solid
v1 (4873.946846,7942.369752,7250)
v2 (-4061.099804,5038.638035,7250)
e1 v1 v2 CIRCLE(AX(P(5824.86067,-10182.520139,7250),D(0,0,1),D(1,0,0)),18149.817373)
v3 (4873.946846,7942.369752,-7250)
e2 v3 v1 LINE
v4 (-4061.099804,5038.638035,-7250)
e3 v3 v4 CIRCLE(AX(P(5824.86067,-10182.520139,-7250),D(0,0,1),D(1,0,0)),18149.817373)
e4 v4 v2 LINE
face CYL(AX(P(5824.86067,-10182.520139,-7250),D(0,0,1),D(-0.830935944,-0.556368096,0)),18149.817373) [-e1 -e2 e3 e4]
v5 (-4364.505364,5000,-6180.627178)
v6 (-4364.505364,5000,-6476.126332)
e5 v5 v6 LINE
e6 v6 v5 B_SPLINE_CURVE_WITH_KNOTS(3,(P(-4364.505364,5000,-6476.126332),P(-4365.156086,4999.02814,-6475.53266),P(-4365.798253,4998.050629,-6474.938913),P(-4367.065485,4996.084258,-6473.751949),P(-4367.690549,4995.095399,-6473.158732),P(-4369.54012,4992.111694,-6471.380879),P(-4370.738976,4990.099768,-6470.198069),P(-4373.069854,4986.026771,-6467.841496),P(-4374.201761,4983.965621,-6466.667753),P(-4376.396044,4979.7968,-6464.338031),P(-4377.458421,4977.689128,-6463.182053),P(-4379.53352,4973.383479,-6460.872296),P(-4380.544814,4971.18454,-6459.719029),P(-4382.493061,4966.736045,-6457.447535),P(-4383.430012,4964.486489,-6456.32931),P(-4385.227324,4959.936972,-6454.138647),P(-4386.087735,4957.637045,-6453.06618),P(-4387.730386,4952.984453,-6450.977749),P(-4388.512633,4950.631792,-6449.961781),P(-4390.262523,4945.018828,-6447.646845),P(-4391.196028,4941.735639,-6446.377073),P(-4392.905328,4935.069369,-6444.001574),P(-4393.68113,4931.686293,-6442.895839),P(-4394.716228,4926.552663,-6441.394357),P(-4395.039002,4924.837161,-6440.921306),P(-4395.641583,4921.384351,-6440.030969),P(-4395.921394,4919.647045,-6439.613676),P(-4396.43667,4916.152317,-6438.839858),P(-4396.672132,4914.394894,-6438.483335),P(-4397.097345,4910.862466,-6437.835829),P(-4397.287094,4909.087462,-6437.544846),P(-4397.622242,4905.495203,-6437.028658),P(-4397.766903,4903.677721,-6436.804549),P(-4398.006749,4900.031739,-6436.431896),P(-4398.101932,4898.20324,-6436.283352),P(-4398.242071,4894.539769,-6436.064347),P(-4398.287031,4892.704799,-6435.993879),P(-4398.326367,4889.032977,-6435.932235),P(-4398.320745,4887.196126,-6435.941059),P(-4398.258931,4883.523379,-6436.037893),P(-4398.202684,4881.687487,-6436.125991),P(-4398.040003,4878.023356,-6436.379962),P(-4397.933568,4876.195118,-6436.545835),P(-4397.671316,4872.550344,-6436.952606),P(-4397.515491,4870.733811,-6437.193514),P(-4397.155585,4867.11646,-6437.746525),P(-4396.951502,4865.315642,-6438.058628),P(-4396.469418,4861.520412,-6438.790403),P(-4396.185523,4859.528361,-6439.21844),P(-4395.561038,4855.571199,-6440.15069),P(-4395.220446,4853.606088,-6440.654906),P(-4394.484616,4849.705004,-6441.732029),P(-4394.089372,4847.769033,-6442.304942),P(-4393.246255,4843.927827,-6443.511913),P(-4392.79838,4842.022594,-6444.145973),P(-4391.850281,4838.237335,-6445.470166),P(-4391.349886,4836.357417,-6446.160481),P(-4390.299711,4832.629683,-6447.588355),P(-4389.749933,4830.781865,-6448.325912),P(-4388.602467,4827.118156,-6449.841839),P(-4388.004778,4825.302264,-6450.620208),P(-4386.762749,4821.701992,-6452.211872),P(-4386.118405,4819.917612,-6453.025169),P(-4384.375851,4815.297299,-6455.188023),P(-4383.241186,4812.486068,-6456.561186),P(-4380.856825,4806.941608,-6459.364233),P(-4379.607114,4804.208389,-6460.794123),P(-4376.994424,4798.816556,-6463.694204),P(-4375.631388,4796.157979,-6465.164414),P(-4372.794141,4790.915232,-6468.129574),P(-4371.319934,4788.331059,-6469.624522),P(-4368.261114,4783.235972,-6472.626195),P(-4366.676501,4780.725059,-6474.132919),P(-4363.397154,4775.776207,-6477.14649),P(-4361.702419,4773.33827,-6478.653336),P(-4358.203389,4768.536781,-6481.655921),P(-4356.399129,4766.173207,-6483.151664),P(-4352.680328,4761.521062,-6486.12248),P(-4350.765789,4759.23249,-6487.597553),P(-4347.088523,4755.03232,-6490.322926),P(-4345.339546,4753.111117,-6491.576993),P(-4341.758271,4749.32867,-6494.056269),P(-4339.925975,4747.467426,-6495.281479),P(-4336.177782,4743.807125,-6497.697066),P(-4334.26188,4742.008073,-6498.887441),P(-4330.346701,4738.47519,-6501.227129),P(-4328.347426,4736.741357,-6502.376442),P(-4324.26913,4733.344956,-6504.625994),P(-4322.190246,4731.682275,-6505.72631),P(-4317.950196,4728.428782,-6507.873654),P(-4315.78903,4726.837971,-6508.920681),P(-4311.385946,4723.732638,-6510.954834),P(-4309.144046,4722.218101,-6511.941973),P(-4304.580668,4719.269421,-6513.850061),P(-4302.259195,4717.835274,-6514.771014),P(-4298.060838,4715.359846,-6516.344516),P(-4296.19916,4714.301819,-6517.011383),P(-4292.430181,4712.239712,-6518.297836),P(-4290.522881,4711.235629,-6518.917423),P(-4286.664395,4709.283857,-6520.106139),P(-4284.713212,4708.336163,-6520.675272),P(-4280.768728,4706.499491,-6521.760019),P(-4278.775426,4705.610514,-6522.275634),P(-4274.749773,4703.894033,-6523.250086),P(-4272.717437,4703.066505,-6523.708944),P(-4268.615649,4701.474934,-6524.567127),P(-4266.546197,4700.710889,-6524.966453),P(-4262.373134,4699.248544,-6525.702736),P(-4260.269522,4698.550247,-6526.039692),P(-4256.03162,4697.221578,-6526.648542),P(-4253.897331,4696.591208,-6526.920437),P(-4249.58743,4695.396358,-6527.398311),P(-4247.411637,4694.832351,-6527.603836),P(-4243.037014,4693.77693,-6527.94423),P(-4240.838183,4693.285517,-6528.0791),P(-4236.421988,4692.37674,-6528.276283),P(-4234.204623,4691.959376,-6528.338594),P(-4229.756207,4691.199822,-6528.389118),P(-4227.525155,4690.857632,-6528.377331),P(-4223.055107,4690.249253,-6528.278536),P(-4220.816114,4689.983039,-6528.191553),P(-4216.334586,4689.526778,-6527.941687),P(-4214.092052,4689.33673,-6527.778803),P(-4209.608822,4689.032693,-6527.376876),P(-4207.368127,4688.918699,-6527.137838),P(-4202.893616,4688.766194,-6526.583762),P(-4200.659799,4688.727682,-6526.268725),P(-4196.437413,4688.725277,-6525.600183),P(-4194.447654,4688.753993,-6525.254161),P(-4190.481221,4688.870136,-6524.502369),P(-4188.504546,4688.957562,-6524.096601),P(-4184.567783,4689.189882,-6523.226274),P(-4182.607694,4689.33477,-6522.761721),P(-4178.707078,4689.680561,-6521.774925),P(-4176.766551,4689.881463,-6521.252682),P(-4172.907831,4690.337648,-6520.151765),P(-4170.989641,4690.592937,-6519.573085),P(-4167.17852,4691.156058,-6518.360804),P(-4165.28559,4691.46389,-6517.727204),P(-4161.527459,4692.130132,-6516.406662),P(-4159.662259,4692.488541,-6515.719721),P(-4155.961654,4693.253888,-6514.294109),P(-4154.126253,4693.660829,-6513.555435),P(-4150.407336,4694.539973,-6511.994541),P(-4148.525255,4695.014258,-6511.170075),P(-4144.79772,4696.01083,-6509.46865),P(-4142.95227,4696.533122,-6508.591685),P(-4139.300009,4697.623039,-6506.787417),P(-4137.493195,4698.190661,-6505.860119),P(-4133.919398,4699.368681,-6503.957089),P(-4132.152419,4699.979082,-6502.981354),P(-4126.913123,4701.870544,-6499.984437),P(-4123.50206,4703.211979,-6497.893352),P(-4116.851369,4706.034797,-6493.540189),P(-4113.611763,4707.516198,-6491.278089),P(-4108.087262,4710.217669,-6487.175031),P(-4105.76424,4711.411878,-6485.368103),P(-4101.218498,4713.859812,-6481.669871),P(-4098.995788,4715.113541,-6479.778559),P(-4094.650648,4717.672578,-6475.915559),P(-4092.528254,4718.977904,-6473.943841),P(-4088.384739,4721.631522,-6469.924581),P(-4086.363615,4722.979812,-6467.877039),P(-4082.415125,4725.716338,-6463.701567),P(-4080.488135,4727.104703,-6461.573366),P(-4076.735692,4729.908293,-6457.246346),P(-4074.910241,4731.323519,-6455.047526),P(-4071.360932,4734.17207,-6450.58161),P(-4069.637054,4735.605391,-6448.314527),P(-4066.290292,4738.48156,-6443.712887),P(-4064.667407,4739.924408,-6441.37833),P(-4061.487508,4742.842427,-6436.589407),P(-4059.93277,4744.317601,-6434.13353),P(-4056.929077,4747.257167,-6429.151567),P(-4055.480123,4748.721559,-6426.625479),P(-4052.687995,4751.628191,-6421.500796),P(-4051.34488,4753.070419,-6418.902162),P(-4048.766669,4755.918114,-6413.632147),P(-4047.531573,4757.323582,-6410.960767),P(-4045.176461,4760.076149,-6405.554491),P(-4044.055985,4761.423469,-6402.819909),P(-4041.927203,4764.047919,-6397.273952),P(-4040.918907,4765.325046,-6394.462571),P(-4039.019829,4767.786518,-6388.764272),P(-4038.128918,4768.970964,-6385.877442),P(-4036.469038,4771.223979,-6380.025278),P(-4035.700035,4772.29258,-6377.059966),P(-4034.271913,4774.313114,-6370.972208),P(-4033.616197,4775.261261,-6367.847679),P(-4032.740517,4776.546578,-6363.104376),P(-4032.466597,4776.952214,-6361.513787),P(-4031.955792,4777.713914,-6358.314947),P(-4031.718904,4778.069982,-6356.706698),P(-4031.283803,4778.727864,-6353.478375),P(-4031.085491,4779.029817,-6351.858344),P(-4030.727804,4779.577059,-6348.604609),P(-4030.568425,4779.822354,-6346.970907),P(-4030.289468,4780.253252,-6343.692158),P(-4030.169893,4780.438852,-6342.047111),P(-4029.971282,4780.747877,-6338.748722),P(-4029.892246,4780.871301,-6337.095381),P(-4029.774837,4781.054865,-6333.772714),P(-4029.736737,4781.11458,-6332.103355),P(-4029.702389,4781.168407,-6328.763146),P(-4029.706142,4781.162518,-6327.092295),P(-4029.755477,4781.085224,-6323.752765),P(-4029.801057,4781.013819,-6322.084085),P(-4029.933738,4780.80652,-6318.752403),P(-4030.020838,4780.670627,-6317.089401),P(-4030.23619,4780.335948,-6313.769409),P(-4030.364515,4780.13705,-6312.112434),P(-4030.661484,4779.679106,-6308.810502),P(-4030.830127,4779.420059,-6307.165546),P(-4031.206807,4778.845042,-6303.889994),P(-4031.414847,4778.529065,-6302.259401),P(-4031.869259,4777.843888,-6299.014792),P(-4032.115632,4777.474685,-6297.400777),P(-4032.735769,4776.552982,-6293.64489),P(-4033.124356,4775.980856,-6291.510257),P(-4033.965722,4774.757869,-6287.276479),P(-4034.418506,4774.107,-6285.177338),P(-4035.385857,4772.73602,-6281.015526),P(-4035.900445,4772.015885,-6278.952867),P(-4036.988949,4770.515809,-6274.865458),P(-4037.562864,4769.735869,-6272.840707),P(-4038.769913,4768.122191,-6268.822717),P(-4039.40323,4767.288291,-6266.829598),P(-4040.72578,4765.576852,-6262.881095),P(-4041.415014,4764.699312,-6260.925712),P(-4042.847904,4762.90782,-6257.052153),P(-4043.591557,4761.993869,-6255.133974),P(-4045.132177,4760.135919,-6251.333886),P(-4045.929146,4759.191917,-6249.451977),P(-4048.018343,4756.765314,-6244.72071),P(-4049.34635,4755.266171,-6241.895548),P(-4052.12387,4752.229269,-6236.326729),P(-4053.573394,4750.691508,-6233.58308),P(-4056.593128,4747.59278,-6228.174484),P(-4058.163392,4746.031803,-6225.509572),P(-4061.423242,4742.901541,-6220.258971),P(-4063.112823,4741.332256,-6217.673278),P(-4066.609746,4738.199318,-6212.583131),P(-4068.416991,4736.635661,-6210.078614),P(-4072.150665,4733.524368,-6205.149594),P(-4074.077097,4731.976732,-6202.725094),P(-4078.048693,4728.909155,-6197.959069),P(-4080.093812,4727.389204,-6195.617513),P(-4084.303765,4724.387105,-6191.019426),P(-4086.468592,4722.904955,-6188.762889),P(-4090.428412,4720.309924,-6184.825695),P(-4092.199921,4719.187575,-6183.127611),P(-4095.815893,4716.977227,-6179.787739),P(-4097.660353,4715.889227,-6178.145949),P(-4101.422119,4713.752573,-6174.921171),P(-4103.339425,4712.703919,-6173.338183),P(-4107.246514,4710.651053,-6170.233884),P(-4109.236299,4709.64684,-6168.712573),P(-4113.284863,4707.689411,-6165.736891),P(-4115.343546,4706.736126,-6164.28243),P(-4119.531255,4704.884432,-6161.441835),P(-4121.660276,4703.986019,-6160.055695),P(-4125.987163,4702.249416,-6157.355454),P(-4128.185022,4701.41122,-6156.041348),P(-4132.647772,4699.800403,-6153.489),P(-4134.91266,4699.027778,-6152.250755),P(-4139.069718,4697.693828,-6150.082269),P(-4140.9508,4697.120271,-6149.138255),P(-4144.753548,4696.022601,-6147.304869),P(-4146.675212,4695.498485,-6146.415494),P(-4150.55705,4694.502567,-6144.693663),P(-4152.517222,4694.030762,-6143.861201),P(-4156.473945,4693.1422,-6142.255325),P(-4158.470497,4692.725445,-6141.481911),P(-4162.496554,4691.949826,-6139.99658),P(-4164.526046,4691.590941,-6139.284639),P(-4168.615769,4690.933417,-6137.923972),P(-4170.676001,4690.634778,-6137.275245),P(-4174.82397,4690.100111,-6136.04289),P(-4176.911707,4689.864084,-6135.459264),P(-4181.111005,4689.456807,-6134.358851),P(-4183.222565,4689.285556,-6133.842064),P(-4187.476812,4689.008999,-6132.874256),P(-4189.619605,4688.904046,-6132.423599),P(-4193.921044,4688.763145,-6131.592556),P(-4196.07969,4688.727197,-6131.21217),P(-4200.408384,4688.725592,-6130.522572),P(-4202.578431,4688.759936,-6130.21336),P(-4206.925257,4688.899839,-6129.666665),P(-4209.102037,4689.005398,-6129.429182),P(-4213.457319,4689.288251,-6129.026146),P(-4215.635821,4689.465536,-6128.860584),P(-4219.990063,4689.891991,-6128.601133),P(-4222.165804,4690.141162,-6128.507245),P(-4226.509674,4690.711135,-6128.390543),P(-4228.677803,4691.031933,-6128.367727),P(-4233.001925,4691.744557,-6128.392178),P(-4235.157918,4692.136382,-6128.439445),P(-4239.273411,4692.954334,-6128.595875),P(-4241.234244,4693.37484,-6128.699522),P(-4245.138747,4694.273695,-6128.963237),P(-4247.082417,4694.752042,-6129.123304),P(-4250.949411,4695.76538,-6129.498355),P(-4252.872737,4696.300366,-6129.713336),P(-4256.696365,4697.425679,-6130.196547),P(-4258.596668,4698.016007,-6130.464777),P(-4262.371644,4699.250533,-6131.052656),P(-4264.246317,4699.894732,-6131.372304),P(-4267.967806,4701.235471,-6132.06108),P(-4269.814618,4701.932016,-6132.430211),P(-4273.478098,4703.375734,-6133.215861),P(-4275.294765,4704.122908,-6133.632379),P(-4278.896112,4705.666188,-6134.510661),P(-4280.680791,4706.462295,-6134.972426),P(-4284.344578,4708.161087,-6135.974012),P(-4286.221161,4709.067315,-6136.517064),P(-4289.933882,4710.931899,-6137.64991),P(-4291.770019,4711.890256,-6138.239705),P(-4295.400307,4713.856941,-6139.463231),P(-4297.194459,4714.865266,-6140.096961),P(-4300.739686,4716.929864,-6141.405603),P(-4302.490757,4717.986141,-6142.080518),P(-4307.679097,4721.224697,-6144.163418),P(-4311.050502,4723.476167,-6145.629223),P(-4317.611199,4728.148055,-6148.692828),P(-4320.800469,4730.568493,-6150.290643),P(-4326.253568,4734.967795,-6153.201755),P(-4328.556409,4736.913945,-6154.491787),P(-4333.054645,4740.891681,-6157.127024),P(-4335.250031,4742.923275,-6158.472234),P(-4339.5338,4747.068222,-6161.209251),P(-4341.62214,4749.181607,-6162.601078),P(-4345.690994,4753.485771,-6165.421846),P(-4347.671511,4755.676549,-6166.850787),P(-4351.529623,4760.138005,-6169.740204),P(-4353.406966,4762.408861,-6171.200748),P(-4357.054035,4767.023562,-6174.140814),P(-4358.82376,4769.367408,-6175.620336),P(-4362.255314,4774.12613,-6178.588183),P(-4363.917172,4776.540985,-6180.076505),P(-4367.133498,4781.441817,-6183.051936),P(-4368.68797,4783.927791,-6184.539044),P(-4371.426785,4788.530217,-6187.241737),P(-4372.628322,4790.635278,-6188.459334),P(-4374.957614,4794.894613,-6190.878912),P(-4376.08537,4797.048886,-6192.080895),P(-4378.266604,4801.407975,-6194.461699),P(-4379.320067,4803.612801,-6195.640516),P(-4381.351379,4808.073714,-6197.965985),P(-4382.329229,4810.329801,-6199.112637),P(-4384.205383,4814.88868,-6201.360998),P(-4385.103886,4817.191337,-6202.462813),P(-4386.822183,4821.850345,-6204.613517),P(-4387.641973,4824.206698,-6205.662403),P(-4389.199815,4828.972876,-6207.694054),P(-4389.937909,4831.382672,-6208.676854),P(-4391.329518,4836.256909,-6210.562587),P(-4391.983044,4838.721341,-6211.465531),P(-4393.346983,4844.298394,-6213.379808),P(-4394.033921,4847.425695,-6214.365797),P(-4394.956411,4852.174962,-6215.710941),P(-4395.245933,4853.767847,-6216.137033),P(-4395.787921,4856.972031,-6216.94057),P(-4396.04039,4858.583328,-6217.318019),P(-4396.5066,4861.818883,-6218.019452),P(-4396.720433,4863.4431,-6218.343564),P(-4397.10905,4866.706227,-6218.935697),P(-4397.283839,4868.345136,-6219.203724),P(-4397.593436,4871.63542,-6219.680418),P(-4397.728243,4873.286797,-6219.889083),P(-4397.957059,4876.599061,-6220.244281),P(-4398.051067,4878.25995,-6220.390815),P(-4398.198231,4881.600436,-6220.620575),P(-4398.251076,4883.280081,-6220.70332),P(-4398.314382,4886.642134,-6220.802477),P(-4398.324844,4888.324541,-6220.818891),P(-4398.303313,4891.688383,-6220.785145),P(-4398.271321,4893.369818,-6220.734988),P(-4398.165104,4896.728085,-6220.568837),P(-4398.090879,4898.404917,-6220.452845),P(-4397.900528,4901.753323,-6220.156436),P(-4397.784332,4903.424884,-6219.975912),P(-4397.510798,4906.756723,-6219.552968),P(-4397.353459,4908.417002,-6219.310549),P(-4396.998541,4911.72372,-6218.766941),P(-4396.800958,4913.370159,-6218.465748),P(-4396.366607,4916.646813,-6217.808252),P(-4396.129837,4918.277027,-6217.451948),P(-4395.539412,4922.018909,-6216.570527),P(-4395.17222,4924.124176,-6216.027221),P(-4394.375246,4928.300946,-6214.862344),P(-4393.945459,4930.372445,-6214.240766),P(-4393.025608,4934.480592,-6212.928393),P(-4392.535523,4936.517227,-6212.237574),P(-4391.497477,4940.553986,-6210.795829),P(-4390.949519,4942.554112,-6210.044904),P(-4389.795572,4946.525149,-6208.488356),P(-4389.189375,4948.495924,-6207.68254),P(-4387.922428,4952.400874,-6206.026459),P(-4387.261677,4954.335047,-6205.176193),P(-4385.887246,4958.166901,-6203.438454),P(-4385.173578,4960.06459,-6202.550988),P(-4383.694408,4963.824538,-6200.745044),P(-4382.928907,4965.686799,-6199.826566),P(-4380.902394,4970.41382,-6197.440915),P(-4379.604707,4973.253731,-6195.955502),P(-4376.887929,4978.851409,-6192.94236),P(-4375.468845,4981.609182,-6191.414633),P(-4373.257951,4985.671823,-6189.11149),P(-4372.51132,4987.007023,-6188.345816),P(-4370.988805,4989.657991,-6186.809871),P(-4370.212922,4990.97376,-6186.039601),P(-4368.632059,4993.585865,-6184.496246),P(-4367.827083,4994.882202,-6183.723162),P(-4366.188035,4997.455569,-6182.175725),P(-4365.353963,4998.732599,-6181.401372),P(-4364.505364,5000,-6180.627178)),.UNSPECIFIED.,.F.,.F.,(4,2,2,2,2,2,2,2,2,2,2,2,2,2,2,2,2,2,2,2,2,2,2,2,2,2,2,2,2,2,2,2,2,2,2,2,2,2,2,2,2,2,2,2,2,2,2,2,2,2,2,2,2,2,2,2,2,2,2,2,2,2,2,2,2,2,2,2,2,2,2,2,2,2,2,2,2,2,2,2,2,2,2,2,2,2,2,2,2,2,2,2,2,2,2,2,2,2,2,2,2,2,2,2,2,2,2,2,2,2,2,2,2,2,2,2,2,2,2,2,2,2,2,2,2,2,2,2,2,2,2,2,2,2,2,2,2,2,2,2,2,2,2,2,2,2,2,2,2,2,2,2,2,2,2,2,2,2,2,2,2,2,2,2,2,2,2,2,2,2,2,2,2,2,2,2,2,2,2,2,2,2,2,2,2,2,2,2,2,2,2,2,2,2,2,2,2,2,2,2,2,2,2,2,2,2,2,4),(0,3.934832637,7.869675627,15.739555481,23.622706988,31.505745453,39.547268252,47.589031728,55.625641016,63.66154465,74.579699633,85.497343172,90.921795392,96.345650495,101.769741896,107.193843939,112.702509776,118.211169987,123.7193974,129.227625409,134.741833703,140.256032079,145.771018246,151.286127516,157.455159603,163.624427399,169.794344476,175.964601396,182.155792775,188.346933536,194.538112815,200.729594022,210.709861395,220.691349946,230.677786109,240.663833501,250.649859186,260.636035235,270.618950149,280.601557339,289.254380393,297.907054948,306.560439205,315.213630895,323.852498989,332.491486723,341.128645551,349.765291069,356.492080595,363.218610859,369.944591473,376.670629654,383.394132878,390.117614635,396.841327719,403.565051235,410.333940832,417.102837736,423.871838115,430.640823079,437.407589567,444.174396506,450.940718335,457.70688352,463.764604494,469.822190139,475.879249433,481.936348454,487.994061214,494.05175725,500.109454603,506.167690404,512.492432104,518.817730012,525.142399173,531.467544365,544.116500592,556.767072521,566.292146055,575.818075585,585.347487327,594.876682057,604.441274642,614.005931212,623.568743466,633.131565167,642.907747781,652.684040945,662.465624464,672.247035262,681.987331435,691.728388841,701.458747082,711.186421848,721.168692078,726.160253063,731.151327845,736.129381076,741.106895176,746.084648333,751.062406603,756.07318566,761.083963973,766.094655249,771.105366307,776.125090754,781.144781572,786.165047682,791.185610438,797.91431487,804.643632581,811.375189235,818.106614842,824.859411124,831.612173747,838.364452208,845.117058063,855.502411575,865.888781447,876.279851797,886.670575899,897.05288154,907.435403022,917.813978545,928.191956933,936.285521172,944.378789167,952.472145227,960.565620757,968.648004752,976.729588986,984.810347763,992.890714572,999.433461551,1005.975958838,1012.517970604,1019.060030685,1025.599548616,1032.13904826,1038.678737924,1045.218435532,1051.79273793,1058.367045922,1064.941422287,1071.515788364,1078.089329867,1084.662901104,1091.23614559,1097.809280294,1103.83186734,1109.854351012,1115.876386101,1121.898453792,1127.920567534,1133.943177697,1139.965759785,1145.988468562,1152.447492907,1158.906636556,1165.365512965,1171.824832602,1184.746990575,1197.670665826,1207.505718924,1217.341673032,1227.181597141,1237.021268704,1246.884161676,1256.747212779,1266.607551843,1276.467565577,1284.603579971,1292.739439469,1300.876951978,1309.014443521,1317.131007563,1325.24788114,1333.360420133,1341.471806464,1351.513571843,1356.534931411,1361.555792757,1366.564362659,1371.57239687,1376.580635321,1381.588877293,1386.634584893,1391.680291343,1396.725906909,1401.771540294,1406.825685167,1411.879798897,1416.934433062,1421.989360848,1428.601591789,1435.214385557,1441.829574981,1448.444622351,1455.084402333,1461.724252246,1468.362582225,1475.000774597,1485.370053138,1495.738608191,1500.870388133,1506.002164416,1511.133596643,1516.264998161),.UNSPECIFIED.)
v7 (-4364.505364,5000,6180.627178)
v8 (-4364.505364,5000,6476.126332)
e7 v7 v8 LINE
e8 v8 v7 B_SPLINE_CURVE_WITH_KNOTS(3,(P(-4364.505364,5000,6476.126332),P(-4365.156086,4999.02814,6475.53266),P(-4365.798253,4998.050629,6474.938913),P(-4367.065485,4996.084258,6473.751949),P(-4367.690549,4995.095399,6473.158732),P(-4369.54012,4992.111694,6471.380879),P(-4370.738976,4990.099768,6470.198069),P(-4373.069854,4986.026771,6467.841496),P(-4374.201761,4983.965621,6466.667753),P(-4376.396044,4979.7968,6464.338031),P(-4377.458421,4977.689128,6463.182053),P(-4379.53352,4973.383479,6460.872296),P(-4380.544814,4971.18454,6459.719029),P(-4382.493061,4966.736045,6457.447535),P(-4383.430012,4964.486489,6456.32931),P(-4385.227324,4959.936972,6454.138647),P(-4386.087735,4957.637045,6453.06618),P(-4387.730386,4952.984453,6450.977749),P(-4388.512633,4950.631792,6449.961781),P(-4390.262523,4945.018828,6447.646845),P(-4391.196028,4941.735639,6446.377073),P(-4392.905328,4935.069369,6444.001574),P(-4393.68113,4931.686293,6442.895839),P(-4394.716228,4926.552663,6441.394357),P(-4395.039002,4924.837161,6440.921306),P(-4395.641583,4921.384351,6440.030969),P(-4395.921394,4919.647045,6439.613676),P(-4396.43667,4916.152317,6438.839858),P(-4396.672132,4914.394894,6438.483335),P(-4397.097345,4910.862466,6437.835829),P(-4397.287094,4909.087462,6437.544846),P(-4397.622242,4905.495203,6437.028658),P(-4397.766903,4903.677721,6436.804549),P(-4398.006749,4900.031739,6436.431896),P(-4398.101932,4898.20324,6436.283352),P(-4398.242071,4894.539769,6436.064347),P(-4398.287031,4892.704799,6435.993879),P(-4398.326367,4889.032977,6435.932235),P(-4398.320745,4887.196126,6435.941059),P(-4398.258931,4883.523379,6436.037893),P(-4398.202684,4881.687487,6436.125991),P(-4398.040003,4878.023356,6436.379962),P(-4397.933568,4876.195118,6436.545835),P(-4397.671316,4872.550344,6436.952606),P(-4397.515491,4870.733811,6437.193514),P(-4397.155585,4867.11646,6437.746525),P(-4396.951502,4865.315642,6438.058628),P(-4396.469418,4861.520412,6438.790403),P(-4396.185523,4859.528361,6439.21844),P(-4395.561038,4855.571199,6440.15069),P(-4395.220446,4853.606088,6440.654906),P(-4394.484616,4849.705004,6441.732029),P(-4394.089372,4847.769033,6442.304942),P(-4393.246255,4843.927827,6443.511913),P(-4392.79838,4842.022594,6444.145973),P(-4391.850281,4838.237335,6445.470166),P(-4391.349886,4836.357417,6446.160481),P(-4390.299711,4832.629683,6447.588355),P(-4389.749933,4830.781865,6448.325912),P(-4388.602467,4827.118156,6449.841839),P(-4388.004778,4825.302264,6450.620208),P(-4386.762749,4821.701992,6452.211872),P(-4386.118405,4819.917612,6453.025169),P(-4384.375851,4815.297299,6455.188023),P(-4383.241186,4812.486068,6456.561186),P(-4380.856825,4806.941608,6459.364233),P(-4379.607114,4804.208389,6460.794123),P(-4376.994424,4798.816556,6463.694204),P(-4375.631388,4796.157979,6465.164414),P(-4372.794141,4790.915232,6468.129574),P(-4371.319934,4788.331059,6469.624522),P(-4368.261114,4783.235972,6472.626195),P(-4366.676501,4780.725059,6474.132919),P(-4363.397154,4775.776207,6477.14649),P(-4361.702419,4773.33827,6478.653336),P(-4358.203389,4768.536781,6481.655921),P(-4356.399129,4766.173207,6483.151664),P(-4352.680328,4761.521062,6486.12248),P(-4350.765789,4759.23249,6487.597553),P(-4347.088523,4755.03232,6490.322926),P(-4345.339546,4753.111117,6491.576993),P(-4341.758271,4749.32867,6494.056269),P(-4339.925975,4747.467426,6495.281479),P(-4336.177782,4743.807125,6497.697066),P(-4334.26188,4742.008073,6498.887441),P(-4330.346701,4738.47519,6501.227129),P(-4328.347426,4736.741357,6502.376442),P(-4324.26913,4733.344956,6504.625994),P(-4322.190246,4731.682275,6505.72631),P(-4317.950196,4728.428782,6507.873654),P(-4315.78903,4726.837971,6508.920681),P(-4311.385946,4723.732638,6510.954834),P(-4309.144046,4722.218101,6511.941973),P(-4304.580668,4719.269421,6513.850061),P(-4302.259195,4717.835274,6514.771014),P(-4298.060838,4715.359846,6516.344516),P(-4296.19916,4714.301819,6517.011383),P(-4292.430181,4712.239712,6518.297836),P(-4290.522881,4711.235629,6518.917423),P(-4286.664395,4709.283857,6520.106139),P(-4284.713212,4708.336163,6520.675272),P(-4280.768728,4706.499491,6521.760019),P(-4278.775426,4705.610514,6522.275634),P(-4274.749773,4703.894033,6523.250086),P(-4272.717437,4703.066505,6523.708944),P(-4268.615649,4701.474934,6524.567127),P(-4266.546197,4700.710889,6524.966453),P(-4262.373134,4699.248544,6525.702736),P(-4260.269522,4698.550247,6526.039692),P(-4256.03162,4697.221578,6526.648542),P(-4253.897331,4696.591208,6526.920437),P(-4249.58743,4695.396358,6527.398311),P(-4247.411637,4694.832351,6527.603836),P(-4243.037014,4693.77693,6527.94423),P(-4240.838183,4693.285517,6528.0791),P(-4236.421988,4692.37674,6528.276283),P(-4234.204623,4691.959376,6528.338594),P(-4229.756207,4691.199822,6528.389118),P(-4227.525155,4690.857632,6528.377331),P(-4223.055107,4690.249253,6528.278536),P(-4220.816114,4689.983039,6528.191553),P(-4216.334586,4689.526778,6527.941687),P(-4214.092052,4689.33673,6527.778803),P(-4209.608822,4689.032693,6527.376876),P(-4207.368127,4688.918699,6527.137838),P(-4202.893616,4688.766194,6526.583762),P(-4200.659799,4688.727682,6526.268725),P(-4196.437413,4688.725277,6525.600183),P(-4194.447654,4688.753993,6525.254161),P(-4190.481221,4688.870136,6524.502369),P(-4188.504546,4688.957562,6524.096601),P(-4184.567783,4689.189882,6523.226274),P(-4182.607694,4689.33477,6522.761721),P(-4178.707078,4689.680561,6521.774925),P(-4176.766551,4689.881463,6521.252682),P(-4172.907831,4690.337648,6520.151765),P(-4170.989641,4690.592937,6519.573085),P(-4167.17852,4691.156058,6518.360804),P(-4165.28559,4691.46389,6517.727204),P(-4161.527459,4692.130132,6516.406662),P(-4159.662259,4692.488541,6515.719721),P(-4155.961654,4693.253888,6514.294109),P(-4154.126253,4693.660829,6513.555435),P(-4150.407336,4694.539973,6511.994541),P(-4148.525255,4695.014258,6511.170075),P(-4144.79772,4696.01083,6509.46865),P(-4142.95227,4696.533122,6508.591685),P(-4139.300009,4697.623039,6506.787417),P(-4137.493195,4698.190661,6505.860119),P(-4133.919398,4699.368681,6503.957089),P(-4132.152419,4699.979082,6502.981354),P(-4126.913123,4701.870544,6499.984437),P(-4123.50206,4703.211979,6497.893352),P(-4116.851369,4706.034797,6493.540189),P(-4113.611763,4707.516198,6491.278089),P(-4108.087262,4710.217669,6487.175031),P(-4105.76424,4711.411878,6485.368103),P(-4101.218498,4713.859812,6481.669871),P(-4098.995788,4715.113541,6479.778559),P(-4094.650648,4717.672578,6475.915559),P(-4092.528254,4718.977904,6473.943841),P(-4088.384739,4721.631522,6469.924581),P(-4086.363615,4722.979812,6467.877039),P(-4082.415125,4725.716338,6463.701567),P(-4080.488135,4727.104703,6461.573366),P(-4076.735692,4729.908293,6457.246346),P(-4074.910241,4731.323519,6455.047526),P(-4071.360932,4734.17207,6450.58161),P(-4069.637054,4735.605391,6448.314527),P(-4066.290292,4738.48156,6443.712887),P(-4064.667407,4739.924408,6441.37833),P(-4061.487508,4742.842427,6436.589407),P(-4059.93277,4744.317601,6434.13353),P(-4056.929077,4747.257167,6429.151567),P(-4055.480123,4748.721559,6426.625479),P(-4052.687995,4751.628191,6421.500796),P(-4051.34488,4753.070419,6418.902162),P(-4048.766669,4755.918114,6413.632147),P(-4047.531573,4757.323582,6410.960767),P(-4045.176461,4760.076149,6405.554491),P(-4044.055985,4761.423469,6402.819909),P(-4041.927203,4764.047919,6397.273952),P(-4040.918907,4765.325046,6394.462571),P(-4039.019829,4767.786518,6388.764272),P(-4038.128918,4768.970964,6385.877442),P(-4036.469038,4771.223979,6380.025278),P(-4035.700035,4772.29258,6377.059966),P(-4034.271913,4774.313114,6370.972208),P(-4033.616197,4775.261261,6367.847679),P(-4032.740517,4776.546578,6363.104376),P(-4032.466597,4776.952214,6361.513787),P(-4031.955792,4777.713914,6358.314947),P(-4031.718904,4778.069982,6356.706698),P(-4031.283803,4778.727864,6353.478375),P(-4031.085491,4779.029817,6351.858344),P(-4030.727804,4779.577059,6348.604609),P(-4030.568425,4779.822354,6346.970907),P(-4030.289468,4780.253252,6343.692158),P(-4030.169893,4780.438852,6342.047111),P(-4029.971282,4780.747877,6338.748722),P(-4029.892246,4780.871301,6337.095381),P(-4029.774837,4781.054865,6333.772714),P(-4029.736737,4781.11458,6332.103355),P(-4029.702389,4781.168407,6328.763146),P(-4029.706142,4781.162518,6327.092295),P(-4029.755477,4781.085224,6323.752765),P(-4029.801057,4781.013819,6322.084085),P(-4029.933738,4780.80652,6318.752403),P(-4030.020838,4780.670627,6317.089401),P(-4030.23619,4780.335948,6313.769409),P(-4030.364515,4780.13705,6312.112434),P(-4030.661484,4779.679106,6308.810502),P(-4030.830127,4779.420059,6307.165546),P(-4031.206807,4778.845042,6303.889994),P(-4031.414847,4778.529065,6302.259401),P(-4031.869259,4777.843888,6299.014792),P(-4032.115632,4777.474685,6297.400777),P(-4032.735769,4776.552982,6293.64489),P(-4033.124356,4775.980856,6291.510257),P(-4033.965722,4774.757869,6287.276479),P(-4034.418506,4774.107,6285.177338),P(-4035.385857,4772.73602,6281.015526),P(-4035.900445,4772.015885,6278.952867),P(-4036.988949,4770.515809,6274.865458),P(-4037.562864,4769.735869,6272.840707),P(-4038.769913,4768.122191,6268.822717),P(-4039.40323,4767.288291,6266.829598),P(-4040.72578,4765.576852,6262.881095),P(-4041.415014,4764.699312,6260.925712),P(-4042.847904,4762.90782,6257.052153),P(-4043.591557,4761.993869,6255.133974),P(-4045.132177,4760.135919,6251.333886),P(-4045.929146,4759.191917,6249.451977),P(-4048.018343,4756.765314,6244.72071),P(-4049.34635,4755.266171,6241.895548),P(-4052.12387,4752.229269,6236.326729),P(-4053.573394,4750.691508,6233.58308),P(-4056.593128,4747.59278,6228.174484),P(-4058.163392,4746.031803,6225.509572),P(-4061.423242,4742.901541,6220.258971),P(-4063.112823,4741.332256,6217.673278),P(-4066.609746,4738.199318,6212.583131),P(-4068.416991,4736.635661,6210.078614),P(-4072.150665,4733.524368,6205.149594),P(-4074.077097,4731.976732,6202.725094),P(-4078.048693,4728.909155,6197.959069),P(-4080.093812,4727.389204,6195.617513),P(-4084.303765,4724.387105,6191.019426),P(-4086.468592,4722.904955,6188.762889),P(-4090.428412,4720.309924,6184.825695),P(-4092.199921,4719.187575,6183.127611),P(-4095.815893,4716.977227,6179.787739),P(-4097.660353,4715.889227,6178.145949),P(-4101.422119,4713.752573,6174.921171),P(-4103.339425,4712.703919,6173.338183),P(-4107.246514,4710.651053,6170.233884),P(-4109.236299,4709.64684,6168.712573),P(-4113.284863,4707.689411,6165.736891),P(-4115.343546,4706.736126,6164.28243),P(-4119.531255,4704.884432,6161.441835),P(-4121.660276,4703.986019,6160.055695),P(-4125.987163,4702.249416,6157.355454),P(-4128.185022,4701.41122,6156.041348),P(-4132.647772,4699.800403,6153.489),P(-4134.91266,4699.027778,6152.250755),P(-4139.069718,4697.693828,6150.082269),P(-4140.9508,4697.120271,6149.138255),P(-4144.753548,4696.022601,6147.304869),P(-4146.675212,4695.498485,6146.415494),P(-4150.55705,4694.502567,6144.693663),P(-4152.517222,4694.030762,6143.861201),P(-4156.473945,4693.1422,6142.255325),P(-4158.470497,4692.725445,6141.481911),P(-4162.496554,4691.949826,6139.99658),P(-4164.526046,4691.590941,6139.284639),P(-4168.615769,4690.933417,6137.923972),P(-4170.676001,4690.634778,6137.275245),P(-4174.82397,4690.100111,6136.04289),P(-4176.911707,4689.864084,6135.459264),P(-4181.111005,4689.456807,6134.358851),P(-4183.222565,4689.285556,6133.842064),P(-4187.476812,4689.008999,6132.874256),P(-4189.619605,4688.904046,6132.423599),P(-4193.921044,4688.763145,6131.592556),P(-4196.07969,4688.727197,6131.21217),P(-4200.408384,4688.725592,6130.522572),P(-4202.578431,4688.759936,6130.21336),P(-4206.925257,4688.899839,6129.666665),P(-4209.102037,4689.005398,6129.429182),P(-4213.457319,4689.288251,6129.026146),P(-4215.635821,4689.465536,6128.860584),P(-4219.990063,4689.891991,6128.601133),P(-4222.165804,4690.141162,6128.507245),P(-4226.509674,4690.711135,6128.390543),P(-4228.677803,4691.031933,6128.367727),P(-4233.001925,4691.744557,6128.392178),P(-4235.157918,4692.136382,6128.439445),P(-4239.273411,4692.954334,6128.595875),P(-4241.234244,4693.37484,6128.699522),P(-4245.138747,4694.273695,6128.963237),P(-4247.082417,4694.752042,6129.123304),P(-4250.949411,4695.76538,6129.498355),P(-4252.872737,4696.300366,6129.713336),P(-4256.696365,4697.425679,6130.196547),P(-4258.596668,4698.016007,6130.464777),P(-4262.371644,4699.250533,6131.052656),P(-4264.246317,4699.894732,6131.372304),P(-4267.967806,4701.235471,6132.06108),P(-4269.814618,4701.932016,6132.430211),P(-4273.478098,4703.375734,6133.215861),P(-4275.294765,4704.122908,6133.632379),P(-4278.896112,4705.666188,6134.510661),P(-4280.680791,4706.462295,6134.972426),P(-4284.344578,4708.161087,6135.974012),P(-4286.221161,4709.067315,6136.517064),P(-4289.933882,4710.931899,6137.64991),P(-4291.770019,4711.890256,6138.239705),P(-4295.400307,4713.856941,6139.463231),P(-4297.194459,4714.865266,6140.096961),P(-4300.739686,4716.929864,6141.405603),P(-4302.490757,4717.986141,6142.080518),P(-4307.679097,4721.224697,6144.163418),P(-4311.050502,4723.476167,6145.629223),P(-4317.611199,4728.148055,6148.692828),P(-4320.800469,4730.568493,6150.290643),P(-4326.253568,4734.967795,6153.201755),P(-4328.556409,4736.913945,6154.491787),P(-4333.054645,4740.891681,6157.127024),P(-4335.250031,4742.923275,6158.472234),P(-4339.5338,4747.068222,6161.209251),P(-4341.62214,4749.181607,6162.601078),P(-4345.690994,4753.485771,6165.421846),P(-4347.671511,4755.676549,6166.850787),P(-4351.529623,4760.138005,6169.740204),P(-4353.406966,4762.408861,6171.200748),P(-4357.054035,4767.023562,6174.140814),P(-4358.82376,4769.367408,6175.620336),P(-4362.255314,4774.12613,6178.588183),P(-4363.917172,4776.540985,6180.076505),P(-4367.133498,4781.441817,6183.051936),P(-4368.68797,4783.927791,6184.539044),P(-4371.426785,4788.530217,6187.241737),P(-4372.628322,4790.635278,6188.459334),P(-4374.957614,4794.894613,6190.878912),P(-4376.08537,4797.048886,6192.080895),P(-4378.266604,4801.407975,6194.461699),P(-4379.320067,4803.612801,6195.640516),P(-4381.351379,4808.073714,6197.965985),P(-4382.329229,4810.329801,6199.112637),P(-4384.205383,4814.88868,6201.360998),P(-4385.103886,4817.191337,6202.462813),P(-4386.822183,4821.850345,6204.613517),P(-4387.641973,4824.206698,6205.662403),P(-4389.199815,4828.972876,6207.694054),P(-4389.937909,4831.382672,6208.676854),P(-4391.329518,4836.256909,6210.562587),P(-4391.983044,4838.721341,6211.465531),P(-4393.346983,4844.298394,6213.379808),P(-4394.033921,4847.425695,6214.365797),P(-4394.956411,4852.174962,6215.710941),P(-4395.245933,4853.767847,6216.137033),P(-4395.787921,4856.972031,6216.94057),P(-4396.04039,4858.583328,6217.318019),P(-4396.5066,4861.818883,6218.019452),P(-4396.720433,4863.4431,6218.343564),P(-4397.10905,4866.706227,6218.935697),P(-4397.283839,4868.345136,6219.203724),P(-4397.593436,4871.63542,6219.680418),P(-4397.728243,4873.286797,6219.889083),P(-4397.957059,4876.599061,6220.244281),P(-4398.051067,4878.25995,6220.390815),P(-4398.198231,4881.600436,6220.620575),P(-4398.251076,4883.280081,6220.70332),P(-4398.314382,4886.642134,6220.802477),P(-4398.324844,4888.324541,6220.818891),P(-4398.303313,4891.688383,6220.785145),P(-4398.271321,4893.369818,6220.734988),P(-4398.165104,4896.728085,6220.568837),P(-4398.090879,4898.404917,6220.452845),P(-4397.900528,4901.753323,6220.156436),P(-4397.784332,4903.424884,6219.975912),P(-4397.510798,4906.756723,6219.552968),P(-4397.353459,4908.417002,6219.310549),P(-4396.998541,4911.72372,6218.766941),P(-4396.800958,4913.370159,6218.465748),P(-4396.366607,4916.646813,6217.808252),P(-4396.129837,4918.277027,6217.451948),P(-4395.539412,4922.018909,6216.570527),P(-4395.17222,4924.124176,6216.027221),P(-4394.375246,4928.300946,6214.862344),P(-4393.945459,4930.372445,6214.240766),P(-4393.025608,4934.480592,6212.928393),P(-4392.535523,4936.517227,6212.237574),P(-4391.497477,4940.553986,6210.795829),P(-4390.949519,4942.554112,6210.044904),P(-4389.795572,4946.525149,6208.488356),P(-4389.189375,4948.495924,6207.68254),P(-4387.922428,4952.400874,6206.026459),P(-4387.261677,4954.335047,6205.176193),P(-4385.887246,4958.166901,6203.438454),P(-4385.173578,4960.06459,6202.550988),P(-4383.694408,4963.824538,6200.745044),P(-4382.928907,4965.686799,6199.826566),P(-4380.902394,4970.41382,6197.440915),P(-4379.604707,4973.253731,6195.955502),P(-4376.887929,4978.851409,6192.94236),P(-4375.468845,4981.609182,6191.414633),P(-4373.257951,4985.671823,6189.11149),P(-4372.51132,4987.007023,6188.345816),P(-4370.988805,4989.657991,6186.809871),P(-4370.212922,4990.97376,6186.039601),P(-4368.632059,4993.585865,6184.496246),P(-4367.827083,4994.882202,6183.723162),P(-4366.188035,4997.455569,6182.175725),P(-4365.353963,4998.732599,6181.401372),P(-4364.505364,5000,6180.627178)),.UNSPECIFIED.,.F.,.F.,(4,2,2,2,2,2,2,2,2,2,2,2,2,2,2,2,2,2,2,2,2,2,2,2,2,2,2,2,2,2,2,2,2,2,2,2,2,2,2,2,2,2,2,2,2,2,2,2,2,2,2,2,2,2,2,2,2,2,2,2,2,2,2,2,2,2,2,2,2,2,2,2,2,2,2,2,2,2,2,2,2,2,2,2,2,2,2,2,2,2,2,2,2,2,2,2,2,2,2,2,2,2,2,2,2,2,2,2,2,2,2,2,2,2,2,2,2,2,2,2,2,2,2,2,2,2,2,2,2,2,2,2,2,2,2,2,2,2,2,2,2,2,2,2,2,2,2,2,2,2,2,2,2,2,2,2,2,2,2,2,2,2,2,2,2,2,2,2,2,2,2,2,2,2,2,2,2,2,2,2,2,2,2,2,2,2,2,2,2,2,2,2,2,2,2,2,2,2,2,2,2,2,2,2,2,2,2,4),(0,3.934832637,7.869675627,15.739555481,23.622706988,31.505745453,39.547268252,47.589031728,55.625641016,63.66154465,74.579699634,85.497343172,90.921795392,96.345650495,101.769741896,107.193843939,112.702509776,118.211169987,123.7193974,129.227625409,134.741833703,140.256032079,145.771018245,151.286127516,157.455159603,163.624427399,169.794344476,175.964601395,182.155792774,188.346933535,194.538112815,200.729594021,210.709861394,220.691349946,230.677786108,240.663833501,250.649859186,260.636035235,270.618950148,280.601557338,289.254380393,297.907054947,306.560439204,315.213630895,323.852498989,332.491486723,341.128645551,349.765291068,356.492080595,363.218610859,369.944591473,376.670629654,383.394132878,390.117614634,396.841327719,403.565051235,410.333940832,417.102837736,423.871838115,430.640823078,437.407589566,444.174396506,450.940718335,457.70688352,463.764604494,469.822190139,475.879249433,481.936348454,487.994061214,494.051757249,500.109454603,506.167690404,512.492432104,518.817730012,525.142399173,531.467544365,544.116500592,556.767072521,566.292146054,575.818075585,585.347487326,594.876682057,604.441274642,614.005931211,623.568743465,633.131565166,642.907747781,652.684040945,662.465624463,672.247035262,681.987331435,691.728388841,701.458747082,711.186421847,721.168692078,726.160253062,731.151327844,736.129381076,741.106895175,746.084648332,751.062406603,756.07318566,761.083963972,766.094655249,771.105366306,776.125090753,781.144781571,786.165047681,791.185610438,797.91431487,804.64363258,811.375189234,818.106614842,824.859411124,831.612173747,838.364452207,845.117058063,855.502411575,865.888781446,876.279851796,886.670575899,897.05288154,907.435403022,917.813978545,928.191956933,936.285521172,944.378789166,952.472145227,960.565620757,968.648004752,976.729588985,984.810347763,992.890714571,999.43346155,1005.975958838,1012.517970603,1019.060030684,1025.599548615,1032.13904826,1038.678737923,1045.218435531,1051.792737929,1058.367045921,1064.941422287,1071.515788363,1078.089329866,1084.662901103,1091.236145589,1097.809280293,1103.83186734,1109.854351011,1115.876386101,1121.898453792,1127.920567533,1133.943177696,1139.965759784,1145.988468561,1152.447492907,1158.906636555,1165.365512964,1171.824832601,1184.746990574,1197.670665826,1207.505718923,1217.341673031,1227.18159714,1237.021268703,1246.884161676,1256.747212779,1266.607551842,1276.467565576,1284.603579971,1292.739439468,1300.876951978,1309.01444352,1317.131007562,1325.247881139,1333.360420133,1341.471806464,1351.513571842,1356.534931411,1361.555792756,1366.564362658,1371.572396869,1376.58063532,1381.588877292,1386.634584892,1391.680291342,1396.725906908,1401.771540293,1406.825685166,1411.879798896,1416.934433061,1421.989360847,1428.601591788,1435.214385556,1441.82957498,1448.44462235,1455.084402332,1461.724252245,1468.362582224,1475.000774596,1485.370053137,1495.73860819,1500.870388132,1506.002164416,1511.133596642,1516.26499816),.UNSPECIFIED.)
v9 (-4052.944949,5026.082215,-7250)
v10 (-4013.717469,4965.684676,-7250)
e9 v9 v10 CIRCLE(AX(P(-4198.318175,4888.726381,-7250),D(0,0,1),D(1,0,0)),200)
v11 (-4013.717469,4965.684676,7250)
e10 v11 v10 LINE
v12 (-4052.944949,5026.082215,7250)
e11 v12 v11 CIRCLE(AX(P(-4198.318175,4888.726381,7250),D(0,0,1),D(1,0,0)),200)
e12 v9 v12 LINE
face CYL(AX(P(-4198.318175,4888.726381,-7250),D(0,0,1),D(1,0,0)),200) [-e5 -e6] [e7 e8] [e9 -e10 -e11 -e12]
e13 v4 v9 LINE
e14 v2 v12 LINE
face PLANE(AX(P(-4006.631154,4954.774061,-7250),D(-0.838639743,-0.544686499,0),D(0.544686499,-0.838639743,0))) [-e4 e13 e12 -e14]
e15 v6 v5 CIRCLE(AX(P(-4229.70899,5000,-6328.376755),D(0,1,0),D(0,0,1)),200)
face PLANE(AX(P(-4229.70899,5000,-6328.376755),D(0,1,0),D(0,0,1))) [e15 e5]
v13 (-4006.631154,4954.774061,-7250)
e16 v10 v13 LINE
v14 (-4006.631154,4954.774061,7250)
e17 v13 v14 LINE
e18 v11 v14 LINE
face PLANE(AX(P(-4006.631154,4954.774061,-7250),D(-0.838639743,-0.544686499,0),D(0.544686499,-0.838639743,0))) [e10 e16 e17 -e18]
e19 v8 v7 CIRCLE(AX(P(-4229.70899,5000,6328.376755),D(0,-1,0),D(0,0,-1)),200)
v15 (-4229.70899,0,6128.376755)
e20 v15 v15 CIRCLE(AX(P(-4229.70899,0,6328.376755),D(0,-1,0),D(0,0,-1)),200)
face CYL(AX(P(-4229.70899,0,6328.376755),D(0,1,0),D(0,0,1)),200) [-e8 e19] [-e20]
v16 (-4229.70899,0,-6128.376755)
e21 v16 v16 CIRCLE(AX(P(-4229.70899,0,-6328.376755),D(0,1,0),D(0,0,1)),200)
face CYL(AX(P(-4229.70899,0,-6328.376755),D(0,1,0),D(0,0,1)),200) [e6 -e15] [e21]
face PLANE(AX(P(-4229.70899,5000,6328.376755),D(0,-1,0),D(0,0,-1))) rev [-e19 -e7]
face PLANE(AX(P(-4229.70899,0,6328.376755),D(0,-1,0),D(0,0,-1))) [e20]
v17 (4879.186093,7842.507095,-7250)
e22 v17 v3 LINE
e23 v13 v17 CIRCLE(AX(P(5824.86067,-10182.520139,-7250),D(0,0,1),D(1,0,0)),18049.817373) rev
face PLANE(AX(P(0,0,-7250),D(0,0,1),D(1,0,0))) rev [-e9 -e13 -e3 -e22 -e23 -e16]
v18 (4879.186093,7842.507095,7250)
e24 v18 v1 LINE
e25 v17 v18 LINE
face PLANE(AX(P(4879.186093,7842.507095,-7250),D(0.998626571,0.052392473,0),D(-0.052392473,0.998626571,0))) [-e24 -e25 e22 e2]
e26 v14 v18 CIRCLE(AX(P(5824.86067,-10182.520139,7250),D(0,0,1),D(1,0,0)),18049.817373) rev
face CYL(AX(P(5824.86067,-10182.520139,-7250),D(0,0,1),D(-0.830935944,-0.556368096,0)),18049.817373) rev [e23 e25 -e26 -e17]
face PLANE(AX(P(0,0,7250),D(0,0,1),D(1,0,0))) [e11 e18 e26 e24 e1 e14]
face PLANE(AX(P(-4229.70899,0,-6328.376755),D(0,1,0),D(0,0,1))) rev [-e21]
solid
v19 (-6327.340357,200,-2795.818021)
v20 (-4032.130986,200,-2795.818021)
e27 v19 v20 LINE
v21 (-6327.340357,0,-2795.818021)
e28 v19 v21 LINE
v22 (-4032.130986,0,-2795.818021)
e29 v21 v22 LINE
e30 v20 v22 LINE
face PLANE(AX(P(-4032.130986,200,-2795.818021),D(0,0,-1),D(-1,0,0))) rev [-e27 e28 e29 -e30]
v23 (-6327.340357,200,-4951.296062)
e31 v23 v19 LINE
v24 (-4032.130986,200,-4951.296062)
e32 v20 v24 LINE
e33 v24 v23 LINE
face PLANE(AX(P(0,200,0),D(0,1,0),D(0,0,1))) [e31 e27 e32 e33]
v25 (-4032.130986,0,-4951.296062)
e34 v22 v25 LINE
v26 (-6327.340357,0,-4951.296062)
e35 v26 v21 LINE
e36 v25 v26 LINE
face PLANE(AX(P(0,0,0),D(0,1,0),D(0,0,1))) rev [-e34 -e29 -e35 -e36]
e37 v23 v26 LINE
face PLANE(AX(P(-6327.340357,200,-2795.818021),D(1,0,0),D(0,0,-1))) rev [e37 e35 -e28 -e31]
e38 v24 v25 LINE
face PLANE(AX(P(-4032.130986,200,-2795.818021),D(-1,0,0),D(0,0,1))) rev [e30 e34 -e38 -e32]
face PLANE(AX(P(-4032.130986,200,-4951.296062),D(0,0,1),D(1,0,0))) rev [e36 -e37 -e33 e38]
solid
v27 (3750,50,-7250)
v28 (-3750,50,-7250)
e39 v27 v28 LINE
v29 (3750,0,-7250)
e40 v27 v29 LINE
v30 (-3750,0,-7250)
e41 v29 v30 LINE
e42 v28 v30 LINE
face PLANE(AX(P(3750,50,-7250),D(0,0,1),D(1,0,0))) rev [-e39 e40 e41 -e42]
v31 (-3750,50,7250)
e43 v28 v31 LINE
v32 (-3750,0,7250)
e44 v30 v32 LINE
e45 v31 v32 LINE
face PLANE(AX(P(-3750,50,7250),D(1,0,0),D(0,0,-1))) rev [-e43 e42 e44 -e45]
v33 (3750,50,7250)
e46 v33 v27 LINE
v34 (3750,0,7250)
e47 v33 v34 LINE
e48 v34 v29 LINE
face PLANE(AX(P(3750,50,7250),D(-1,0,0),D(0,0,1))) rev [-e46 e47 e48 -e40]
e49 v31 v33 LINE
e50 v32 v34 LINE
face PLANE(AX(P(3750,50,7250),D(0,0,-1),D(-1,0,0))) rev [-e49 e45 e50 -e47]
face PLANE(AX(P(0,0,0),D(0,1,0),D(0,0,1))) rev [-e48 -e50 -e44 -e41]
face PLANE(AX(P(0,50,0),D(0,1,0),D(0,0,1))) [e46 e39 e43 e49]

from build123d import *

# Parameters (mm, degrees)
SKETCH1_W           = 7500
SKETCH1_H           = 14500
BOSS_EXTRUDE1_DEPTH = 50
SKETCH2_W           = 2295.209370317
SKETCH2_H           = 2155.478040844
BOSS_EXTRUDE2_DEPTH = 200
BOSS_EXTRUDE6_DEPTH = 14500
SKETCH7_R           = 200
BOSS_EXTRUDE7_DEPTH = 14500
FLEX1_START         = -7250
FLEX1_DEPTH         = 14500
FLEX1_2_DEPTH       = 14500
SKETCH8_R           = 200
BOSS_EXTRUDE8_DEPTH = 5000


# Read off the part's stored shape, not the designer's step: Flex1
with BuildPart() as part:
    # Sketch1 → Boss-Extrude1 (new body)
    with BuildSketch(Plane(origin=(0, 0, 0), x_dir=(1, 0, 0), z_dir=(0, 1, 0))):
        Rectangle(SKETCH1_W, SKETCH1_H)
    extrude(amount=BOSS_EXTRUDE1_DEPTH)


with BuildPart() as body_2:
    # Sketch2 → Boss-Extrude2 (new body)
    with BuildSketch(Plane(origin=(0, 0, 0), x_dir=(1, 0, 0), z_dir=(0, 1, 0))):
        with Locations((-5179.735671531, 3873.557041916)):
            Rectangle(SKETCH2_W, SKETCH2_H)
    extrude(amount=BOSS_EXTRUDE2_DEPTH)


with BuildPart() as body_3:
    # Sketch6 → Boss-Extrude6 (new body)
    with BuildSketch(Plane.XY.offset(7250)):
        Polygon((-4004.312581595, 4958.453202823), (3972.037258969, 10299.161598928), (3916.400449414, 10382.255193281), (-4059.94939115, 5041.546797177), align=None)
    extrude(amount=-BOSS_EXTRUDE6_DEPTH)

    # Flex1 outline → Flex1 (cut)
    with BuildSketch(Plane.XY.offset(FLEX1_START)):
        with BuildLine():
            Line((-4059.94939115, 5041.546797177), (-4058.940612826, 5040.040186399))
            ThreePointArc((-4058.940612826, 5040.040186399), (-3357.212748232, 5473.322169875), (-2636.526368855, 5874.279045028))
            Line((-2636.526368855, 5874.279045028), (3972.037258969, 10299.161598928))
            Line((3972.037258969, 10299.161598928), (3916.400449414, 10382.255193281))
            Line((3916.400449414, 10382.255193281), (-4059.94939115, 5041.546797177))
        make_face()
    extrude(amount=FLEX1_DEPTH, mode=Mode.SUBTRACT)

    # Flex1 2 outline → Flex1 2 (add)
    with BuildSketch(Plane.XY.offset(FLEX1_START)):
        with BuildLine():
            ThreePointArc((-4058.940612826, 5040.040186399), (-4060.02023341, 5039.339149017), (-4061.099804272, 5038.638035066))
            Line((-4061.099804272, 5038.638035066), (-4006.631154417, 4954.77406078))
            ThreePointArc((-4006.631154417, 4954.77406078), (246.188836109, 6983.560594539), (4879.186092901, 7842.507094583))
            Line((4879.186092901, 7842.507094583), (4873.94684556, 7942.369751704))
            ThreePointArc((4873.94684556, 7942.369751704), (1006.447894186, 7316.016056247), (-2636.526368855, 5874.279045028))
            Line((-2636.526368855, 5874.279045028), (-4004.312581595, 4958.453202823))
            Line((-4004.312581595, 4958.453202823), (-4058.940612826, 5040.040186399))
        make_face()
    extrude(amount=FLEX1_2_DEPTH)



with BuildPart() as body_4:
    # Sketch7 → Boss-Extrude7 (new body)
    with BuildSketch(Plane.XY.offset(7250)):
        with Locations((-4198.318175079, 4888.72638089)):
            Circle(SKETCH7_R)
    extrude(amount=-BOSS_EXTRUDE7_DEPTH)


with BuildPart() as body_3_1:
    add(body_3.part)

    add(body_4.part)  # Boss-Extrude8 merges body 4
    # Sketch8 → Boss-Extrude8 (add)
    with BuildSketch(Plane(origin=(0, 5000, 0), x_dir=(1, 0, 0), z_dir=(0, 1, 0))):
        with Locations(Location((-4229.708989675, 6328.376755088, 0), (0, 0, 270))):
            Circle(SKETCH8_R)
        with Locations(Location((-4229.708989675, -6328.376755088, 0), (0, 0, 227.62486357))):
            Circle(SKETCH8_R)
    extrude(amount=-BOSS_EXTRUDE8_DEPTH)


solid = Compound([part.part, body_2.part, body_3_1.part])
